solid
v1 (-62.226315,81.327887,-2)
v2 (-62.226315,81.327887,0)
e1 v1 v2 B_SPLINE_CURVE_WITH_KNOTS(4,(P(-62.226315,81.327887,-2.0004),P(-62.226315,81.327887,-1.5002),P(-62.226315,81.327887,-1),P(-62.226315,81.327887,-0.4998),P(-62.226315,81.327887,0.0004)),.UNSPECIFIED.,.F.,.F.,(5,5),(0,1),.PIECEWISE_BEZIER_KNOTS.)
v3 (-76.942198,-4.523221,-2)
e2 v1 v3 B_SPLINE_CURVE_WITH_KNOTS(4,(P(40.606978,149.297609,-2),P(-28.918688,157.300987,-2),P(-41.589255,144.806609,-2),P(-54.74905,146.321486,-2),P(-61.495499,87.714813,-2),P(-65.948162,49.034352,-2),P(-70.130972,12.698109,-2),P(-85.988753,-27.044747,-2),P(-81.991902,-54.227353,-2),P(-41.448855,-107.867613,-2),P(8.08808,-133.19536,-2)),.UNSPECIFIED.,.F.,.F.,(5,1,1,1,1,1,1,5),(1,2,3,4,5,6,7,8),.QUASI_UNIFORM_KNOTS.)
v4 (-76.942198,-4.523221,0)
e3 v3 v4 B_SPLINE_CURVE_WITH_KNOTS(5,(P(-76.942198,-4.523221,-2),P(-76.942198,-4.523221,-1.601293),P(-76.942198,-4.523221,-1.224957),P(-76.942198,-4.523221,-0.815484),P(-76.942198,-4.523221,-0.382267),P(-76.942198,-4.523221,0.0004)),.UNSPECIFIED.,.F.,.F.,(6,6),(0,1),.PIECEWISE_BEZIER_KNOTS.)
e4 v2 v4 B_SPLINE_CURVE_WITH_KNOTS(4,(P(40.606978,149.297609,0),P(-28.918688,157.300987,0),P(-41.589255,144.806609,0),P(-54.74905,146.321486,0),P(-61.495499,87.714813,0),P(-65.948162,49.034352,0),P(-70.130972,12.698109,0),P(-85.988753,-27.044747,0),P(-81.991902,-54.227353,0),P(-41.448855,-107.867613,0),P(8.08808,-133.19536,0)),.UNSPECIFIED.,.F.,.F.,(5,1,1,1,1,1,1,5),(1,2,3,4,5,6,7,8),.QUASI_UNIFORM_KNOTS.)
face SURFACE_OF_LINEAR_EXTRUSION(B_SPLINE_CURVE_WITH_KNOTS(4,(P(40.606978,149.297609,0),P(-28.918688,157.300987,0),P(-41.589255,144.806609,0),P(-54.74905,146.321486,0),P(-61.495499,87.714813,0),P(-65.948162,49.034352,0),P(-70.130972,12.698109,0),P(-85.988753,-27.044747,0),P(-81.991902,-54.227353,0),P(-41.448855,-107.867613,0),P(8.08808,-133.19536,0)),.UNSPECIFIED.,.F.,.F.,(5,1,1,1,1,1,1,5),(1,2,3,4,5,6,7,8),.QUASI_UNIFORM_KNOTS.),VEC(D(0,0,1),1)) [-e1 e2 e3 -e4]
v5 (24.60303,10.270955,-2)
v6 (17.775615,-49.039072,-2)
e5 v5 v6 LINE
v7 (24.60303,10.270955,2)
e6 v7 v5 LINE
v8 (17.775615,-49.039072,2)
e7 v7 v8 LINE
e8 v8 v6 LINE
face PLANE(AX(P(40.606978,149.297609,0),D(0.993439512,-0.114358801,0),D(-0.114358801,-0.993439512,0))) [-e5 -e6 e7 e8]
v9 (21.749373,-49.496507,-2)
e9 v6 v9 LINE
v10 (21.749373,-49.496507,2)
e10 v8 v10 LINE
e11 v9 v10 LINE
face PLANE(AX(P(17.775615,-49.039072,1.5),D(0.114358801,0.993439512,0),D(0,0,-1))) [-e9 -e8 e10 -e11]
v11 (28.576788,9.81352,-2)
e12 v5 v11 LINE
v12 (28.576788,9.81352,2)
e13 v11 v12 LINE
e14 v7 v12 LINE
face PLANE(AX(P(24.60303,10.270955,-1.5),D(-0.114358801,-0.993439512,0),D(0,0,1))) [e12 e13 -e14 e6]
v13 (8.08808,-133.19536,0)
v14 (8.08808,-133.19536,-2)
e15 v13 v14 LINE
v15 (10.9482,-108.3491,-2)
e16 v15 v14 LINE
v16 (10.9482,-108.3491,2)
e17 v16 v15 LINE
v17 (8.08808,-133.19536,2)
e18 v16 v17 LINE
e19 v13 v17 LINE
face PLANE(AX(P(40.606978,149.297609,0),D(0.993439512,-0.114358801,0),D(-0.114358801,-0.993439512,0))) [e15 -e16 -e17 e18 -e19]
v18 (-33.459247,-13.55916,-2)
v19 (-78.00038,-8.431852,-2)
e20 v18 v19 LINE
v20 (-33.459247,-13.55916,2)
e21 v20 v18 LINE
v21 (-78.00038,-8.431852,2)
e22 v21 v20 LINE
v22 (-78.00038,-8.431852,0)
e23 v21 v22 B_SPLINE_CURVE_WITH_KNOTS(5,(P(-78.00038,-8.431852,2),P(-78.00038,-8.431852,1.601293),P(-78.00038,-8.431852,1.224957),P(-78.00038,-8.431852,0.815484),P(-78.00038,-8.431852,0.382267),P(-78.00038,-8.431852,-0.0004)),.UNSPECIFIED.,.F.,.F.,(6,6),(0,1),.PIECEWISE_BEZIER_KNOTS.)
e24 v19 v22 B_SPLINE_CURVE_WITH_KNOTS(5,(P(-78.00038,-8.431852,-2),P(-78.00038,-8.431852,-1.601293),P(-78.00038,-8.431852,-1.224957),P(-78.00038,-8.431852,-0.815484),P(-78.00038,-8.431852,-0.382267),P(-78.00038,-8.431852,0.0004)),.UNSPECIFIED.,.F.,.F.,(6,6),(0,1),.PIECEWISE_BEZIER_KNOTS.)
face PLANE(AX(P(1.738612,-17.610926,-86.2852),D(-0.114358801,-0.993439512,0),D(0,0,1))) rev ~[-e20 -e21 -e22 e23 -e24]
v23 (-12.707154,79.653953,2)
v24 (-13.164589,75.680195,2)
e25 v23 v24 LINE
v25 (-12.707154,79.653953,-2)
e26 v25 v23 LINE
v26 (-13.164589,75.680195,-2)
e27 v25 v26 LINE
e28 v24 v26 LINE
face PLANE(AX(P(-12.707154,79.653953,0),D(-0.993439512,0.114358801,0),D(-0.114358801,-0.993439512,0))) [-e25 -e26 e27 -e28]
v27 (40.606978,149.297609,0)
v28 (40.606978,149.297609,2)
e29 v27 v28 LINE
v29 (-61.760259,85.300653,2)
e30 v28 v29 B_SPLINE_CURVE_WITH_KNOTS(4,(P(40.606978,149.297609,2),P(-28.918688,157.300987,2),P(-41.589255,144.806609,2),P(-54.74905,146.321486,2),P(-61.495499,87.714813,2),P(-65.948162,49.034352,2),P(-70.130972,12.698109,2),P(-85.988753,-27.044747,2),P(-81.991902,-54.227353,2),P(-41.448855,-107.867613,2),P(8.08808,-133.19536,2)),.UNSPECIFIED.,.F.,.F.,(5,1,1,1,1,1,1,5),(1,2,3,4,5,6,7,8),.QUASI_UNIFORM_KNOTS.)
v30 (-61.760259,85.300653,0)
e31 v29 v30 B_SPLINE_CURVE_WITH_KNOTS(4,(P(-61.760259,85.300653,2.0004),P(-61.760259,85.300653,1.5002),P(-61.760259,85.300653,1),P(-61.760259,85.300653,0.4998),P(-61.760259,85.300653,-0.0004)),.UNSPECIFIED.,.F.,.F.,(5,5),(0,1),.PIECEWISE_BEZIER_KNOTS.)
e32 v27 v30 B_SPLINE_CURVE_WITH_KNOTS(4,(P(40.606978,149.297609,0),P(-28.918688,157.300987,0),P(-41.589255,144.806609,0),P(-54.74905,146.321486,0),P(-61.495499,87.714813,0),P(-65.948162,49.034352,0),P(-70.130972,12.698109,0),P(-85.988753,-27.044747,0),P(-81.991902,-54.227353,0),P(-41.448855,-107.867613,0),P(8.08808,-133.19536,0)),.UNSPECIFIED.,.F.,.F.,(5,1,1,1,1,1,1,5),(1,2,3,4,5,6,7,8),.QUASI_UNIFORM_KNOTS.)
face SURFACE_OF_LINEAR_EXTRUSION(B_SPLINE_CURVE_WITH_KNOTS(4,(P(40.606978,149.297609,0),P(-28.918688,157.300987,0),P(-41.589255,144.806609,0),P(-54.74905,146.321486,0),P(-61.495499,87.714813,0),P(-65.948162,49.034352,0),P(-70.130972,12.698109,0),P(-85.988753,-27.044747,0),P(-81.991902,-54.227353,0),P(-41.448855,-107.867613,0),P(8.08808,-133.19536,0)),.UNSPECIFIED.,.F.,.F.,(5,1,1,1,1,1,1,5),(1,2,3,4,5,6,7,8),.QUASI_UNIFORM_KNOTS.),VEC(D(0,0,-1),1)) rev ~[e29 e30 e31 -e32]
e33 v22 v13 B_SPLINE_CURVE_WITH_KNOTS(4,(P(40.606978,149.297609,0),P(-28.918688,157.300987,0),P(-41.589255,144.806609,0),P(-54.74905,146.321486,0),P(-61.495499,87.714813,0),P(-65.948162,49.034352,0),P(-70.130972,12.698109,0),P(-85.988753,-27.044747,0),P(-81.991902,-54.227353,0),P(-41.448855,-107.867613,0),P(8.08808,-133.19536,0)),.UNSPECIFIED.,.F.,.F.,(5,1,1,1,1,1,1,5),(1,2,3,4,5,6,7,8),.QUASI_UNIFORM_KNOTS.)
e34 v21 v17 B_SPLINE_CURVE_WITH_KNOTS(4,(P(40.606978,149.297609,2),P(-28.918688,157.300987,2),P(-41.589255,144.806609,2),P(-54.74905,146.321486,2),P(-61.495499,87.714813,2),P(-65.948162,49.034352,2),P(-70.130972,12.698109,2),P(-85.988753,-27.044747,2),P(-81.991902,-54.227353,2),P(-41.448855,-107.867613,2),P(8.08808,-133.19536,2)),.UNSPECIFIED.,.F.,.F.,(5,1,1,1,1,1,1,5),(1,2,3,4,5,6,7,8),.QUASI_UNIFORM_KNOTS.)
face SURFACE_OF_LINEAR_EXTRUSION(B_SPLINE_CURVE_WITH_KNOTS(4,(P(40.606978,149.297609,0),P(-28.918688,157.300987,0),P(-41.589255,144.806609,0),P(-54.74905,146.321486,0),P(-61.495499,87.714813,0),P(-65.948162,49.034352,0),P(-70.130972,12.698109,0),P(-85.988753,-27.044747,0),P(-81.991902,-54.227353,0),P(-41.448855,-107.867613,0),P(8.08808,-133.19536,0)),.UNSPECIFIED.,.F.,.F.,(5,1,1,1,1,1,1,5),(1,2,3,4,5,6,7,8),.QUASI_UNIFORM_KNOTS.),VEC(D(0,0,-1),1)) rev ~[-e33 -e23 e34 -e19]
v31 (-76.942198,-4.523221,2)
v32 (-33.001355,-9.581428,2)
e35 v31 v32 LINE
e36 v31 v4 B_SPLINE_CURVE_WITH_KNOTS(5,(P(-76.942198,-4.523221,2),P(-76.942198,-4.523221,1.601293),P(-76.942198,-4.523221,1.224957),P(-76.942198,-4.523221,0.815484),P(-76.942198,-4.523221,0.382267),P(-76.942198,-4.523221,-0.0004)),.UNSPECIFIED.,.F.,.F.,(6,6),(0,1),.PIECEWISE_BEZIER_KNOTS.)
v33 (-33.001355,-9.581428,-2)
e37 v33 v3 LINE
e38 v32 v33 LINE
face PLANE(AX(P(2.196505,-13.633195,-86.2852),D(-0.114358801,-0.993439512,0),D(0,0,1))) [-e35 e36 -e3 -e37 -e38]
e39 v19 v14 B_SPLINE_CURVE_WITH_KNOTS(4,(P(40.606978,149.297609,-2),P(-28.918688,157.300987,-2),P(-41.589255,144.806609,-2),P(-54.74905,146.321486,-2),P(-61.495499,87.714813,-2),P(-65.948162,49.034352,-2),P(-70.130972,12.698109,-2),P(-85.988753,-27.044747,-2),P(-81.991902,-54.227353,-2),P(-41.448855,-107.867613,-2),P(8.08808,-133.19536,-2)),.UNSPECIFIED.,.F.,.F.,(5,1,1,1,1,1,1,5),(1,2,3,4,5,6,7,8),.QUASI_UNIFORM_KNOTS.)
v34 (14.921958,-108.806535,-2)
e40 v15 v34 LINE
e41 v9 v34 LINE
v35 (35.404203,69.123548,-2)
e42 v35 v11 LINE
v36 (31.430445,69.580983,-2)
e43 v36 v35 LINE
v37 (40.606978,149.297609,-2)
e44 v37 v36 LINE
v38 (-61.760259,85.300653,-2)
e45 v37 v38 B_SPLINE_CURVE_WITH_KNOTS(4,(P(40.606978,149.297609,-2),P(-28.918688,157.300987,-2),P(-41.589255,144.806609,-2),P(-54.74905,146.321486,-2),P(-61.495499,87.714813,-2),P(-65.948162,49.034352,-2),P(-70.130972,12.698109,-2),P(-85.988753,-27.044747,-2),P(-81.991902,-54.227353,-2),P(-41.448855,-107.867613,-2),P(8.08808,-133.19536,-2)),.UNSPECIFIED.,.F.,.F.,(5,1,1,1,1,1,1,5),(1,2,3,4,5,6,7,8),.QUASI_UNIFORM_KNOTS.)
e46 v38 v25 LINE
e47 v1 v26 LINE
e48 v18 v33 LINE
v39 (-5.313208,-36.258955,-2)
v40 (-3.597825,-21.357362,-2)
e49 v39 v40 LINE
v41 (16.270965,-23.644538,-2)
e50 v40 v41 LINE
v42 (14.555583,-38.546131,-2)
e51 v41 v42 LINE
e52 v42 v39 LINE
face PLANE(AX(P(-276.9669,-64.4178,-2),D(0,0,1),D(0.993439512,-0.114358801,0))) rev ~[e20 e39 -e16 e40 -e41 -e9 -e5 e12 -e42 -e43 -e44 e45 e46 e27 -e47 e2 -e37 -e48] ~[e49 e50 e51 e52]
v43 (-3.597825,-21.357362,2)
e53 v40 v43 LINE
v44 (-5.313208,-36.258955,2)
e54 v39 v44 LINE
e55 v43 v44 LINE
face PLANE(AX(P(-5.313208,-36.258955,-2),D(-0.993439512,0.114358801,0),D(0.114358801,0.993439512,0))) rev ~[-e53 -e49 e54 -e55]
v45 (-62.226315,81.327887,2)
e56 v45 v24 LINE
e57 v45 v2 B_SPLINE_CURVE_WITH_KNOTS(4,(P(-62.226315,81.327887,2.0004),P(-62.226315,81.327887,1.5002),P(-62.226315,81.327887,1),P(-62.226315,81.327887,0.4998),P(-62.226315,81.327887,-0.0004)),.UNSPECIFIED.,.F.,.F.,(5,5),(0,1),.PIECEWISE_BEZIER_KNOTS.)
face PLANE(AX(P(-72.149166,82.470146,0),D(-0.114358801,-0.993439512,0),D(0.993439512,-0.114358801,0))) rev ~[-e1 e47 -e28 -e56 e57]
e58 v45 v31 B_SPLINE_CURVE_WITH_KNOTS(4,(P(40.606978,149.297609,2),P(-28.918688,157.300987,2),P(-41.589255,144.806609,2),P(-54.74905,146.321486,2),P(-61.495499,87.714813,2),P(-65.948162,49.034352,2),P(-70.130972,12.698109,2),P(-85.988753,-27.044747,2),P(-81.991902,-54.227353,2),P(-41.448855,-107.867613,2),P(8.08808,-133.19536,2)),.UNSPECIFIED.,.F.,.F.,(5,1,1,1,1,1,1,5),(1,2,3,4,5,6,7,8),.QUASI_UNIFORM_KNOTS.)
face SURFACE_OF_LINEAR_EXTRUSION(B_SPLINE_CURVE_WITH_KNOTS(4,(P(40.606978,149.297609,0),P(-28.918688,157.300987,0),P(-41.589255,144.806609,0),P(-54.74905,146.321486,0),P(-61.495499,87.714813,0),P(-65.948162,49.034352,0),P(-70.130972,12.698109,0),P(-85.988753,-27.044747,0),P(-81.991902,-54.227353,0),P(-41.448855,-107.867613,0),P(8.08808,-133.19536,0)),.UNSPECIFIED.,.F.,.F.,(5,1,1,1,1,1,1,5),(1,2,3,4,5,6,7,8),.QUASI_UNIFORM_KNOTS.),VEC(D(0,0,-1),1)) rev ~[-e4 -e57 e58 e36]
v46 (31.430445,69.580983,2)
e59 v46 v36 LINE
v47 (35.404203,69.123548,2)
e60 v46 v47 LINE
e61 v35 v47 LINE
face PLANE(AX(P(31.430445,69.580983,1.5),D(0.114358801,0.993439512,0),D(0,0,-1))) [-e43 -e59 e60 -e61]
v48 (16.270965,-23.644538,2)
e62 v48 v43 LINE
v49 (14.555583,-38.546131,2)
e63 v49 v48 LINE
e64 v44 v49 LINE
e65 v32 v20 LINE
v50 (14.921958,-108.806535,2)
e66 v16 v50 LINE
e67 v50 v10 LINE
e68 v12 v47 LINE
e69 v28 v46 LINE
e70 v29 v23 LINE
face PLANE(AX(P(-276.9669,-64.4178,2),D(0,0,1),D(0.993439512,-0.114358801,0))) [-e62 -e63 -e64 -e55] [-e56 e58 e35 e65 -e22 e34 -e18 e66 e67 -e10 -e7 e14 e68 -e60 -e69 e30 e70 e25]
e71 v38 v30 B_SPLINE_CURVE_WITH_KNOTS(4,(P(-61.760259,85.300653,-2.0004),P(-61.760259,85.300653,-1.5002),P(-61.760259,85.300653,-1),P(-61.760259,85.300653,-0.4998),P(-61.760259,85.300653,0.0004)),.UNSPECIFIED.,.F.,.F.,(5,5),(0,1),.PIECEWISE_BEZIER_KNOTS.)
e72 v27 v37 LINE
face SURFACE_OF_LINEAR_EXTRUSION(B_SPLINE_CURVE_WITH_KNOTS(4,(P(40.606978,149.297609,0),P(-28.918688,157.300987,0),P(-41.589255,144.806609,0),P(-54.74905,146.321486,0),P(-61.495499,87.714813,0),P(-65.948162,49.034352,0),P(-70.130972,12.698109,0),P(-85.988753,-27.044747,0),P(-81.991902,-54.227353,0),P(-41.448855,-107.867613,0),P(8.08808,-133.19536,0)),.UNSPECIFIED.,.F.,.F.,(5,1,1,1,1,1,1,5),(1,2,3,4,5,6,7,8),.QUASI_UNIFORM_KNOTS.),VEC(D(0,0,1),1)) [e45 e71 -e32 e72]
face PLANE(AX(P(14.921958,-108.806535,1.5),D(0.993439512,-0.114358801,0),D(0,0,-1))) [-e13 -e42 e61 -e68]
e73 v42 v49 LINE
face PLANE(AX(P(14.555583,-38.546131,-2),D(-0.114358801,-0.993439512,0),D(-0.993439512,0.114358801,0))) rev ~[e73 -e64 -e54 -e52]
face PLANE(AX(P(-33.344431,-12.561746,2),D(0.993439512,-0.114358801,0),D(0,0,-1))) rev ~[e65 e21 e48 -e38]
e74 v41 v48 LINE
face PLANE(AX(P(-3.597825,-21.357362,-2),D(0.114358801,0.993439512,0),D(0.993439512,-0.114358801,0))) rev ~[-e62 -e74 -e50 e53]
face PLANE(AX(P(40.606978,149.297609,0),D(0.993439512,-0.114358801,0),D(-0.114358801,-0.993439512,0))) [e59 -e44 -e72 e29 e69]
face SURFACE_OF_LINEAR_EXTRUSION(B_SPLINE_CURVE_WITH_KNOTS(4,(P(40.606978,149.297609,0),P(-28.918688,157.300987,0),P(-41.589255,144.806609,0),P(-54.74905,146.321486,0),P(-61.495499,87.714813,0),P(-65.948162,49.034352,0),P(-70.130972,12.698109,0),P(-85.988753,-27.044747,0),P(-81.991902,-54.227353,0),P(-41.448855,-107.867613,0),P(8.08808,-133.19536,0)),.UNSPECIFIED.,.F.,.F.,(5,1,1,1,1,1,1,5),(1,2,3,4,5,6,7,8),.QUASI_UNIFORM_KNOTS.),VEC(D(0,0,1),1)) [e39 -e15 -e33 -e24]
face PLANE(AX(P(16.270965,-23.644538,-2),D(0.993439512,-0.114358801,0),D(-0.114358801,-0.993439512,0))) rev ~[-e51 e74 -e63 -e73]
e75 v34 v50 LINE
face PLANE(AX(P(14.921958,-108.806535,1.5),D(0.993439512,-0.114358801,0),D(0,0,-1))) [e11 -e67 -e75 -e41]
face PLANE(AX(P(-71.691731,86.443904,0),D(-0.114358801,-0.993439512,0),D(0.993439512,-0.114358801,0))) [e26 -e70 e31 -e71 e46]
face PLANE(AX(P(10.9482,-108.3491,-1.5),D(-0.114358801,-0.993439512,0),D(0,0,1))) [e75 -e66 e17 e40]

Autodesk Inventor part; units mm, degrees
ref_plane "YZ Plane" through (0, 0, 0) normal (1, 0, 0) x (0, 1, 0)
ref_plane "XZ Plane" through (0, 0, 0) normal (0, 1, 0) x (-1, 0, 0)
ref_plane "XY Plane" through (0, 0, 0) normal (0, 0, 1) x (1, 0, 0)
ref_plane "РабПлоскость1" through (-276.9669, -64.4178, 0) normal (0, 0, 1) x (0.9934395, -0.1143588, 0)
sketch "Эскиз1" plane through (-276.9669, -64.4178, 0) normal (0, 0, 1) x (0.9934395, -0.1143588, 0)
  line L0 (291.0502, 248.6307) -> (221.0654, 248.6307) construction
  line L1 (221.0654, 248.6307) -> (209.9068, 234.7693) construction
  line L2 (209.9068, 234.7693) -> (196.6601, 234.7693) construction
  line L3 (196.6601, 234.7693) -> (196.6601, 175.7756) construction
  line L4 (196.6601, 175.7756) -> (196.6601, 136.8397) construction
  line L5 (196.6601, 136.8397) -> (196.6601, 100.2635) construction
  line L6 (196.6601, 100.2635) -> (185.4513, 58.9679) construction
  line L7 (185.4513, 58.9679) -> (192.5305, 32.4207) construction
  line L8 (192.5305, 32.4207) -> (238.9418, -16.2312) construction
  line L9 (238.9418, -16.2312) -> (291.0502, -35.7278) construction
  spline S0 degree 4 poles (291.0502, 248.6307) (221.0654, 248.6307) (209.9068, 234.7693) (196.6601, 234.7693) (196.6601, 175.7756) (196.6601, 136.8397) (196.6601, 100.2635) (185.4513, 58.9679) (192.5305, 32.4207) (238.9418, -16.2312) (291.0502, -35.7278) knots 1 1 1 1 1 2 3 4 5 6 7 8 8 8 8 8
  line L10 (291.0502, 248.6307) -> (291.0502, -35.7278)
  line L11 (295.0502, 248.6307) -> (291.0502, 248.6307) projected
  line L12 (291.0502, 248.6307) -> (591.0502, 248.6307) construction
  line L13 (291.0502, 248.6307) -> (-95.7817, 248.6307)
  line L14 (295.0502, -35.7278) -> (291.0502, -35.7278) projected
  line L15 (291.0502, -35.7278) -> (207.0762, -35.7278)
  point P0 (267.7832, 95.6688)
extrude "Выдавливание1" add sketch "Эскиз1" along normal mid plane 4
sketch "Эскиз2" plane through (10.9482, -108.3491, 1.5) normal (0.9934395, -0.1143588, 0) x (0, 0, -1)
  line L0 (3, 0) -> (0, 0) projected
  line L1 (0, 0) -> (0, 59.7017)
  line L2 (-0.5, -25.0103) -> (-0.5, 259.3482) projected
  line L3 (3.5, 259.3482) -> (3.5, -25.0103) projected
  line L4 (3, 59.7017) -> (3, 119.4034)
  line L5 (0, 119.4034) -> (0, 179.1051)
  line L6 (0, 179.1051) -> (3, 179.1051)
  line L7 (3, 179.1051) -> (3, 238.8068)
  line L8 (0, 238.8068) -> (0, 298.5085)
  line L9 (0, 298.5085) -> (3, 298.5085) projected
  line L10 (0, 59.7017) -> (3, 59.7017)
  line L11 (3, 119.4034) -> (0, 119.4034)
  line L12 (3, 238.8068) -> (0, 238.8068)
  line L13 (0, 59.7017) -> (0, 119.4034)
  line L14 (0, 179.1051) -> (0, 238.8068)
  line L15 (3, 238.8068) -> (3, 298.5085)
  line L16 (0, 298.5085) -> (3, 298.5085)
  line L17 (0, 0) -> (3, 0)
  line L18 (3, 59.7017) -> (3, 0)
  line L19 (3, 59.7017) -> (0, 59.7017)
  line L20 (0, 119.4034) -> (3, 119.4034)
  line L21 (0, 59.7017) -> (0, 119.4034)
  line L22 (3, 179.1051) -> (0, 179.1051)
  line L23 (0, 238.8068) -> (3, 238.8068)
  line L24 (3, 238.8068) -> (3, 298.5085)
  line L25 (0, 298.5085) -> (3, 298.5085)
  line L26 (0, 238.8068) -> (0, 298.5085)
  line L27 (3, 179.1051) -> (3.5, 179.1051)
  line L28 (3, 119.4034) -> (3.5, 119.4034)
  line L29 (3.5, 179.1051) -> (3.5, 119.4034)
  line L30 (0, 179.1051) -> (-0.5, 179.1051)
  line L31 (-0.5, 179.1051) -> (-0.5, 119.4034)
  line L32 (0, 119.4034) -> (-0.5, 119.4034)
  line L33 (3, 59.7017) -> (3.5, 59.7017)
  line L34 (3.5, 59.7017) -> (3.5, 0)
  line L35 (3, 0) -> (3.5, 0)
  line L36 (0, 0) -> (-0.5, 0)
  line L37 (-0.5, 0) -> (-0.5, 59.7017)
  line L38 (-0.5, 59.7017) -> (0, 59.7017)
  point P0 (1.5, 106.3863)
  point P1 (3.5, -25.0103)
  point P2 (3, 59.7017)
extrude "Выдавливание2" add sketch "Эскиз2" along normal blind 4 contours L0 L1 L10 L18 | L18 L33 L3 L35 | L36 L2 L38 L1 | L11 L5 L6 L27 L3 L28 | L32 L2 L30 L5
sketch "Эскиз3" plane through (-276.9669, -64.4178, 0) normal (0, 0, 1) x (0.9934395, -0.1143588, 0)
  point P0 (267.7832, 95.6688)
sketch "Эскиз4" plane through (-276.9669, -64.4178, 0) normal (0, 0, 1) x (0.9934395, -0.1143588, 0)
  line L0 (-21.9452, -13.2655) -> (34.011, -13.2655) projected
  line L1 (-21.9452, -13.2655) -> (34.011, -13.2655) projected
  line L2 (34.011, -13.2655) -> (34.011, -16.2655) projected
  line L3 (-21.9452, -13.2655) -> (34.011, -13.2655) projected
  line L4 (-21.9452, -16.2655) -> (-21.9452, -13.2655) projected
  line L5 (34.011, -16.2655) -> (-21.9452, -16.2655) projected
  line L6 (-21.9452, -16.2655) -> (-21.9452, -13.2655)
  line L7 (-69.5874, -16.2655) -> (-21.9452, -16.2655)
  line L8 (-21.9452, -13.2655) -> (-69.5874, -13.2655)
  line L9 (-69.5874, -13.2655) -> (-69.5874, -16.2655)
  line L10 (-21.9452, -13.2655) -> (-21.9452, -12.7655)
  line L11 (-21.9452, -12.7655) -> (-69.5874, -12.7655)
  line L12 (-69.5874, -12.7655) -> (-69.5874, -13.2655)
  line L13 (-69.5874, -16.2655) -> (-69.5874, -16.7655)
  line L14 (-69.5874, -16.7655) -> (-21.9452, -16.7655)
  line L15 (-21.9452, -16.7655) -> (-21.9452, -16.2655)
  point P0 (267.7832, 95.6688)
  point P1 (-66.0194, -13.2655)
  dimension "d16" = 0.5
  dimension "d17" = 0.5
extrude "Выдавливание3" cut sketch "Эскиз4" against normal through all both and the other way through all contours L4 L7 L9 L8 | L8 L12 L11 L10 | L15 L14 L13 L7
sketch "Эскиз5" plane through (-276.9669, -64.4178, 0) normal (0, 0, 1) x (0.9934395, -0.1143588, 0)
  line L0 (291.0502, 173.347) -> (291.0502, 169.347) projected
  line L1 (246.0502, 173.347) -> (291.0502, 173.347) projected
  line L2 (246.0502, 173.347) -> (246.0502, 169.347) projected
  line L3 (291.0502, 169.347) -> (246.0502, 169.347) projected
  line L4 (246.0502, 173.347) -> (246.0502, 169.347)
  line L5 (186.6761, 173.347) -> (246.0502, 173.347)
  line L6 (186.6761, 173.347) -> (186.6761, 169.347)
  line L7 (186.6761, 169.347) -> (246.0502, 169.347)
  line L8 (246.0502, 173.347) -> (246.0502, 169.347)
  line L9 (186.6761, 173.347) -> (186.6761, 173.847)
  line L10 (186.6761, 173.847) -> (246.0502, 173.847)
  line L11 (246.0502, 173.847) -> (246.0502, 173.347)
  line L12 (246.0502, 169.347) -> (246.0502, 168.847)
  line L13 (246.0502, 168.847) -> (186.6761, 168.847)
  line L14 (186.6761, 168.847) -> (186.6761, 169.347)
  point P0 (267.7832, 95.6688)
  dimension "d14" = 0.5
  dimension "d15" = 0.5
sketch "Эскиз6" plane through (-276.9669, -64.4178, -2) normal (0, 0, -1) x (-0.9934395, 0.1143588, 0)
  line L0 (16.8024, -31.0891) -> (36.8024, -31.0891)
  line L1 (36.8024, -31.0891) -> (36.8024, -46.0891)
  line L2 (36.8024, -46.0891) -> (16.8024, -46.0891)
  line L3 (16.8024, -46.0891) -> (16.8024, -31.0891)
  line L4 (-286.6513, 74.0401) -> (-286.6513, 59.0401)
  line L5 (-286.6513, 59.0401) -> (-266.6513, 59.0401)
  line L6 (-266.6513, 59.0401) -> (-266.6513, 74.0401)
  line L7 (-266.6513, 74.0401) -> (-286.6513, 74.0401)
  point P0 (-267.7832, 95.6688)
  dimension "d10" = 20
  dimension "d11" = 15
  dimension "d18" = 15
  dimension "d19" = 20
extrude "Выдавливание6" cut sketch "Эскиз6" against normal through all contours L7 L6 L5 L4
ref_plane "РабПлоскость2" through (1.8532, -16.6155, -86.2852) normal (-0.1143588, -0.9934395, 0) x (0, 0, 1)
sketch "Эскиз8" plane through (1.8532, -16.6155, -86.2852) normal (-0.1143588, -0.9934395, 0) x (0, 0, 1)
  line L0 (88.2852, 35.4303) -> (84.2852, 35.4303) projected
  line L1 (84.2852, 35.4303) -> (84.2852, 89.0995)
  line L2 (84.2852, 89.0995) -> (88.2852, 89.0995)
  line L3 (88.2852, 89.0995) -> (88.2852, 35.4303)
  point P0 (86.2852, 3.7412)
extrude "Выдавливание7" cut sketch "Эскиз8" along normal blind 1 and the other way blind 3
extrude "Выдавливание8" cut sketch "Эскиз5" against normal through all both and the other way through all contours L2 L7 L6 L5
properties part number "поперечная_поддержка"
